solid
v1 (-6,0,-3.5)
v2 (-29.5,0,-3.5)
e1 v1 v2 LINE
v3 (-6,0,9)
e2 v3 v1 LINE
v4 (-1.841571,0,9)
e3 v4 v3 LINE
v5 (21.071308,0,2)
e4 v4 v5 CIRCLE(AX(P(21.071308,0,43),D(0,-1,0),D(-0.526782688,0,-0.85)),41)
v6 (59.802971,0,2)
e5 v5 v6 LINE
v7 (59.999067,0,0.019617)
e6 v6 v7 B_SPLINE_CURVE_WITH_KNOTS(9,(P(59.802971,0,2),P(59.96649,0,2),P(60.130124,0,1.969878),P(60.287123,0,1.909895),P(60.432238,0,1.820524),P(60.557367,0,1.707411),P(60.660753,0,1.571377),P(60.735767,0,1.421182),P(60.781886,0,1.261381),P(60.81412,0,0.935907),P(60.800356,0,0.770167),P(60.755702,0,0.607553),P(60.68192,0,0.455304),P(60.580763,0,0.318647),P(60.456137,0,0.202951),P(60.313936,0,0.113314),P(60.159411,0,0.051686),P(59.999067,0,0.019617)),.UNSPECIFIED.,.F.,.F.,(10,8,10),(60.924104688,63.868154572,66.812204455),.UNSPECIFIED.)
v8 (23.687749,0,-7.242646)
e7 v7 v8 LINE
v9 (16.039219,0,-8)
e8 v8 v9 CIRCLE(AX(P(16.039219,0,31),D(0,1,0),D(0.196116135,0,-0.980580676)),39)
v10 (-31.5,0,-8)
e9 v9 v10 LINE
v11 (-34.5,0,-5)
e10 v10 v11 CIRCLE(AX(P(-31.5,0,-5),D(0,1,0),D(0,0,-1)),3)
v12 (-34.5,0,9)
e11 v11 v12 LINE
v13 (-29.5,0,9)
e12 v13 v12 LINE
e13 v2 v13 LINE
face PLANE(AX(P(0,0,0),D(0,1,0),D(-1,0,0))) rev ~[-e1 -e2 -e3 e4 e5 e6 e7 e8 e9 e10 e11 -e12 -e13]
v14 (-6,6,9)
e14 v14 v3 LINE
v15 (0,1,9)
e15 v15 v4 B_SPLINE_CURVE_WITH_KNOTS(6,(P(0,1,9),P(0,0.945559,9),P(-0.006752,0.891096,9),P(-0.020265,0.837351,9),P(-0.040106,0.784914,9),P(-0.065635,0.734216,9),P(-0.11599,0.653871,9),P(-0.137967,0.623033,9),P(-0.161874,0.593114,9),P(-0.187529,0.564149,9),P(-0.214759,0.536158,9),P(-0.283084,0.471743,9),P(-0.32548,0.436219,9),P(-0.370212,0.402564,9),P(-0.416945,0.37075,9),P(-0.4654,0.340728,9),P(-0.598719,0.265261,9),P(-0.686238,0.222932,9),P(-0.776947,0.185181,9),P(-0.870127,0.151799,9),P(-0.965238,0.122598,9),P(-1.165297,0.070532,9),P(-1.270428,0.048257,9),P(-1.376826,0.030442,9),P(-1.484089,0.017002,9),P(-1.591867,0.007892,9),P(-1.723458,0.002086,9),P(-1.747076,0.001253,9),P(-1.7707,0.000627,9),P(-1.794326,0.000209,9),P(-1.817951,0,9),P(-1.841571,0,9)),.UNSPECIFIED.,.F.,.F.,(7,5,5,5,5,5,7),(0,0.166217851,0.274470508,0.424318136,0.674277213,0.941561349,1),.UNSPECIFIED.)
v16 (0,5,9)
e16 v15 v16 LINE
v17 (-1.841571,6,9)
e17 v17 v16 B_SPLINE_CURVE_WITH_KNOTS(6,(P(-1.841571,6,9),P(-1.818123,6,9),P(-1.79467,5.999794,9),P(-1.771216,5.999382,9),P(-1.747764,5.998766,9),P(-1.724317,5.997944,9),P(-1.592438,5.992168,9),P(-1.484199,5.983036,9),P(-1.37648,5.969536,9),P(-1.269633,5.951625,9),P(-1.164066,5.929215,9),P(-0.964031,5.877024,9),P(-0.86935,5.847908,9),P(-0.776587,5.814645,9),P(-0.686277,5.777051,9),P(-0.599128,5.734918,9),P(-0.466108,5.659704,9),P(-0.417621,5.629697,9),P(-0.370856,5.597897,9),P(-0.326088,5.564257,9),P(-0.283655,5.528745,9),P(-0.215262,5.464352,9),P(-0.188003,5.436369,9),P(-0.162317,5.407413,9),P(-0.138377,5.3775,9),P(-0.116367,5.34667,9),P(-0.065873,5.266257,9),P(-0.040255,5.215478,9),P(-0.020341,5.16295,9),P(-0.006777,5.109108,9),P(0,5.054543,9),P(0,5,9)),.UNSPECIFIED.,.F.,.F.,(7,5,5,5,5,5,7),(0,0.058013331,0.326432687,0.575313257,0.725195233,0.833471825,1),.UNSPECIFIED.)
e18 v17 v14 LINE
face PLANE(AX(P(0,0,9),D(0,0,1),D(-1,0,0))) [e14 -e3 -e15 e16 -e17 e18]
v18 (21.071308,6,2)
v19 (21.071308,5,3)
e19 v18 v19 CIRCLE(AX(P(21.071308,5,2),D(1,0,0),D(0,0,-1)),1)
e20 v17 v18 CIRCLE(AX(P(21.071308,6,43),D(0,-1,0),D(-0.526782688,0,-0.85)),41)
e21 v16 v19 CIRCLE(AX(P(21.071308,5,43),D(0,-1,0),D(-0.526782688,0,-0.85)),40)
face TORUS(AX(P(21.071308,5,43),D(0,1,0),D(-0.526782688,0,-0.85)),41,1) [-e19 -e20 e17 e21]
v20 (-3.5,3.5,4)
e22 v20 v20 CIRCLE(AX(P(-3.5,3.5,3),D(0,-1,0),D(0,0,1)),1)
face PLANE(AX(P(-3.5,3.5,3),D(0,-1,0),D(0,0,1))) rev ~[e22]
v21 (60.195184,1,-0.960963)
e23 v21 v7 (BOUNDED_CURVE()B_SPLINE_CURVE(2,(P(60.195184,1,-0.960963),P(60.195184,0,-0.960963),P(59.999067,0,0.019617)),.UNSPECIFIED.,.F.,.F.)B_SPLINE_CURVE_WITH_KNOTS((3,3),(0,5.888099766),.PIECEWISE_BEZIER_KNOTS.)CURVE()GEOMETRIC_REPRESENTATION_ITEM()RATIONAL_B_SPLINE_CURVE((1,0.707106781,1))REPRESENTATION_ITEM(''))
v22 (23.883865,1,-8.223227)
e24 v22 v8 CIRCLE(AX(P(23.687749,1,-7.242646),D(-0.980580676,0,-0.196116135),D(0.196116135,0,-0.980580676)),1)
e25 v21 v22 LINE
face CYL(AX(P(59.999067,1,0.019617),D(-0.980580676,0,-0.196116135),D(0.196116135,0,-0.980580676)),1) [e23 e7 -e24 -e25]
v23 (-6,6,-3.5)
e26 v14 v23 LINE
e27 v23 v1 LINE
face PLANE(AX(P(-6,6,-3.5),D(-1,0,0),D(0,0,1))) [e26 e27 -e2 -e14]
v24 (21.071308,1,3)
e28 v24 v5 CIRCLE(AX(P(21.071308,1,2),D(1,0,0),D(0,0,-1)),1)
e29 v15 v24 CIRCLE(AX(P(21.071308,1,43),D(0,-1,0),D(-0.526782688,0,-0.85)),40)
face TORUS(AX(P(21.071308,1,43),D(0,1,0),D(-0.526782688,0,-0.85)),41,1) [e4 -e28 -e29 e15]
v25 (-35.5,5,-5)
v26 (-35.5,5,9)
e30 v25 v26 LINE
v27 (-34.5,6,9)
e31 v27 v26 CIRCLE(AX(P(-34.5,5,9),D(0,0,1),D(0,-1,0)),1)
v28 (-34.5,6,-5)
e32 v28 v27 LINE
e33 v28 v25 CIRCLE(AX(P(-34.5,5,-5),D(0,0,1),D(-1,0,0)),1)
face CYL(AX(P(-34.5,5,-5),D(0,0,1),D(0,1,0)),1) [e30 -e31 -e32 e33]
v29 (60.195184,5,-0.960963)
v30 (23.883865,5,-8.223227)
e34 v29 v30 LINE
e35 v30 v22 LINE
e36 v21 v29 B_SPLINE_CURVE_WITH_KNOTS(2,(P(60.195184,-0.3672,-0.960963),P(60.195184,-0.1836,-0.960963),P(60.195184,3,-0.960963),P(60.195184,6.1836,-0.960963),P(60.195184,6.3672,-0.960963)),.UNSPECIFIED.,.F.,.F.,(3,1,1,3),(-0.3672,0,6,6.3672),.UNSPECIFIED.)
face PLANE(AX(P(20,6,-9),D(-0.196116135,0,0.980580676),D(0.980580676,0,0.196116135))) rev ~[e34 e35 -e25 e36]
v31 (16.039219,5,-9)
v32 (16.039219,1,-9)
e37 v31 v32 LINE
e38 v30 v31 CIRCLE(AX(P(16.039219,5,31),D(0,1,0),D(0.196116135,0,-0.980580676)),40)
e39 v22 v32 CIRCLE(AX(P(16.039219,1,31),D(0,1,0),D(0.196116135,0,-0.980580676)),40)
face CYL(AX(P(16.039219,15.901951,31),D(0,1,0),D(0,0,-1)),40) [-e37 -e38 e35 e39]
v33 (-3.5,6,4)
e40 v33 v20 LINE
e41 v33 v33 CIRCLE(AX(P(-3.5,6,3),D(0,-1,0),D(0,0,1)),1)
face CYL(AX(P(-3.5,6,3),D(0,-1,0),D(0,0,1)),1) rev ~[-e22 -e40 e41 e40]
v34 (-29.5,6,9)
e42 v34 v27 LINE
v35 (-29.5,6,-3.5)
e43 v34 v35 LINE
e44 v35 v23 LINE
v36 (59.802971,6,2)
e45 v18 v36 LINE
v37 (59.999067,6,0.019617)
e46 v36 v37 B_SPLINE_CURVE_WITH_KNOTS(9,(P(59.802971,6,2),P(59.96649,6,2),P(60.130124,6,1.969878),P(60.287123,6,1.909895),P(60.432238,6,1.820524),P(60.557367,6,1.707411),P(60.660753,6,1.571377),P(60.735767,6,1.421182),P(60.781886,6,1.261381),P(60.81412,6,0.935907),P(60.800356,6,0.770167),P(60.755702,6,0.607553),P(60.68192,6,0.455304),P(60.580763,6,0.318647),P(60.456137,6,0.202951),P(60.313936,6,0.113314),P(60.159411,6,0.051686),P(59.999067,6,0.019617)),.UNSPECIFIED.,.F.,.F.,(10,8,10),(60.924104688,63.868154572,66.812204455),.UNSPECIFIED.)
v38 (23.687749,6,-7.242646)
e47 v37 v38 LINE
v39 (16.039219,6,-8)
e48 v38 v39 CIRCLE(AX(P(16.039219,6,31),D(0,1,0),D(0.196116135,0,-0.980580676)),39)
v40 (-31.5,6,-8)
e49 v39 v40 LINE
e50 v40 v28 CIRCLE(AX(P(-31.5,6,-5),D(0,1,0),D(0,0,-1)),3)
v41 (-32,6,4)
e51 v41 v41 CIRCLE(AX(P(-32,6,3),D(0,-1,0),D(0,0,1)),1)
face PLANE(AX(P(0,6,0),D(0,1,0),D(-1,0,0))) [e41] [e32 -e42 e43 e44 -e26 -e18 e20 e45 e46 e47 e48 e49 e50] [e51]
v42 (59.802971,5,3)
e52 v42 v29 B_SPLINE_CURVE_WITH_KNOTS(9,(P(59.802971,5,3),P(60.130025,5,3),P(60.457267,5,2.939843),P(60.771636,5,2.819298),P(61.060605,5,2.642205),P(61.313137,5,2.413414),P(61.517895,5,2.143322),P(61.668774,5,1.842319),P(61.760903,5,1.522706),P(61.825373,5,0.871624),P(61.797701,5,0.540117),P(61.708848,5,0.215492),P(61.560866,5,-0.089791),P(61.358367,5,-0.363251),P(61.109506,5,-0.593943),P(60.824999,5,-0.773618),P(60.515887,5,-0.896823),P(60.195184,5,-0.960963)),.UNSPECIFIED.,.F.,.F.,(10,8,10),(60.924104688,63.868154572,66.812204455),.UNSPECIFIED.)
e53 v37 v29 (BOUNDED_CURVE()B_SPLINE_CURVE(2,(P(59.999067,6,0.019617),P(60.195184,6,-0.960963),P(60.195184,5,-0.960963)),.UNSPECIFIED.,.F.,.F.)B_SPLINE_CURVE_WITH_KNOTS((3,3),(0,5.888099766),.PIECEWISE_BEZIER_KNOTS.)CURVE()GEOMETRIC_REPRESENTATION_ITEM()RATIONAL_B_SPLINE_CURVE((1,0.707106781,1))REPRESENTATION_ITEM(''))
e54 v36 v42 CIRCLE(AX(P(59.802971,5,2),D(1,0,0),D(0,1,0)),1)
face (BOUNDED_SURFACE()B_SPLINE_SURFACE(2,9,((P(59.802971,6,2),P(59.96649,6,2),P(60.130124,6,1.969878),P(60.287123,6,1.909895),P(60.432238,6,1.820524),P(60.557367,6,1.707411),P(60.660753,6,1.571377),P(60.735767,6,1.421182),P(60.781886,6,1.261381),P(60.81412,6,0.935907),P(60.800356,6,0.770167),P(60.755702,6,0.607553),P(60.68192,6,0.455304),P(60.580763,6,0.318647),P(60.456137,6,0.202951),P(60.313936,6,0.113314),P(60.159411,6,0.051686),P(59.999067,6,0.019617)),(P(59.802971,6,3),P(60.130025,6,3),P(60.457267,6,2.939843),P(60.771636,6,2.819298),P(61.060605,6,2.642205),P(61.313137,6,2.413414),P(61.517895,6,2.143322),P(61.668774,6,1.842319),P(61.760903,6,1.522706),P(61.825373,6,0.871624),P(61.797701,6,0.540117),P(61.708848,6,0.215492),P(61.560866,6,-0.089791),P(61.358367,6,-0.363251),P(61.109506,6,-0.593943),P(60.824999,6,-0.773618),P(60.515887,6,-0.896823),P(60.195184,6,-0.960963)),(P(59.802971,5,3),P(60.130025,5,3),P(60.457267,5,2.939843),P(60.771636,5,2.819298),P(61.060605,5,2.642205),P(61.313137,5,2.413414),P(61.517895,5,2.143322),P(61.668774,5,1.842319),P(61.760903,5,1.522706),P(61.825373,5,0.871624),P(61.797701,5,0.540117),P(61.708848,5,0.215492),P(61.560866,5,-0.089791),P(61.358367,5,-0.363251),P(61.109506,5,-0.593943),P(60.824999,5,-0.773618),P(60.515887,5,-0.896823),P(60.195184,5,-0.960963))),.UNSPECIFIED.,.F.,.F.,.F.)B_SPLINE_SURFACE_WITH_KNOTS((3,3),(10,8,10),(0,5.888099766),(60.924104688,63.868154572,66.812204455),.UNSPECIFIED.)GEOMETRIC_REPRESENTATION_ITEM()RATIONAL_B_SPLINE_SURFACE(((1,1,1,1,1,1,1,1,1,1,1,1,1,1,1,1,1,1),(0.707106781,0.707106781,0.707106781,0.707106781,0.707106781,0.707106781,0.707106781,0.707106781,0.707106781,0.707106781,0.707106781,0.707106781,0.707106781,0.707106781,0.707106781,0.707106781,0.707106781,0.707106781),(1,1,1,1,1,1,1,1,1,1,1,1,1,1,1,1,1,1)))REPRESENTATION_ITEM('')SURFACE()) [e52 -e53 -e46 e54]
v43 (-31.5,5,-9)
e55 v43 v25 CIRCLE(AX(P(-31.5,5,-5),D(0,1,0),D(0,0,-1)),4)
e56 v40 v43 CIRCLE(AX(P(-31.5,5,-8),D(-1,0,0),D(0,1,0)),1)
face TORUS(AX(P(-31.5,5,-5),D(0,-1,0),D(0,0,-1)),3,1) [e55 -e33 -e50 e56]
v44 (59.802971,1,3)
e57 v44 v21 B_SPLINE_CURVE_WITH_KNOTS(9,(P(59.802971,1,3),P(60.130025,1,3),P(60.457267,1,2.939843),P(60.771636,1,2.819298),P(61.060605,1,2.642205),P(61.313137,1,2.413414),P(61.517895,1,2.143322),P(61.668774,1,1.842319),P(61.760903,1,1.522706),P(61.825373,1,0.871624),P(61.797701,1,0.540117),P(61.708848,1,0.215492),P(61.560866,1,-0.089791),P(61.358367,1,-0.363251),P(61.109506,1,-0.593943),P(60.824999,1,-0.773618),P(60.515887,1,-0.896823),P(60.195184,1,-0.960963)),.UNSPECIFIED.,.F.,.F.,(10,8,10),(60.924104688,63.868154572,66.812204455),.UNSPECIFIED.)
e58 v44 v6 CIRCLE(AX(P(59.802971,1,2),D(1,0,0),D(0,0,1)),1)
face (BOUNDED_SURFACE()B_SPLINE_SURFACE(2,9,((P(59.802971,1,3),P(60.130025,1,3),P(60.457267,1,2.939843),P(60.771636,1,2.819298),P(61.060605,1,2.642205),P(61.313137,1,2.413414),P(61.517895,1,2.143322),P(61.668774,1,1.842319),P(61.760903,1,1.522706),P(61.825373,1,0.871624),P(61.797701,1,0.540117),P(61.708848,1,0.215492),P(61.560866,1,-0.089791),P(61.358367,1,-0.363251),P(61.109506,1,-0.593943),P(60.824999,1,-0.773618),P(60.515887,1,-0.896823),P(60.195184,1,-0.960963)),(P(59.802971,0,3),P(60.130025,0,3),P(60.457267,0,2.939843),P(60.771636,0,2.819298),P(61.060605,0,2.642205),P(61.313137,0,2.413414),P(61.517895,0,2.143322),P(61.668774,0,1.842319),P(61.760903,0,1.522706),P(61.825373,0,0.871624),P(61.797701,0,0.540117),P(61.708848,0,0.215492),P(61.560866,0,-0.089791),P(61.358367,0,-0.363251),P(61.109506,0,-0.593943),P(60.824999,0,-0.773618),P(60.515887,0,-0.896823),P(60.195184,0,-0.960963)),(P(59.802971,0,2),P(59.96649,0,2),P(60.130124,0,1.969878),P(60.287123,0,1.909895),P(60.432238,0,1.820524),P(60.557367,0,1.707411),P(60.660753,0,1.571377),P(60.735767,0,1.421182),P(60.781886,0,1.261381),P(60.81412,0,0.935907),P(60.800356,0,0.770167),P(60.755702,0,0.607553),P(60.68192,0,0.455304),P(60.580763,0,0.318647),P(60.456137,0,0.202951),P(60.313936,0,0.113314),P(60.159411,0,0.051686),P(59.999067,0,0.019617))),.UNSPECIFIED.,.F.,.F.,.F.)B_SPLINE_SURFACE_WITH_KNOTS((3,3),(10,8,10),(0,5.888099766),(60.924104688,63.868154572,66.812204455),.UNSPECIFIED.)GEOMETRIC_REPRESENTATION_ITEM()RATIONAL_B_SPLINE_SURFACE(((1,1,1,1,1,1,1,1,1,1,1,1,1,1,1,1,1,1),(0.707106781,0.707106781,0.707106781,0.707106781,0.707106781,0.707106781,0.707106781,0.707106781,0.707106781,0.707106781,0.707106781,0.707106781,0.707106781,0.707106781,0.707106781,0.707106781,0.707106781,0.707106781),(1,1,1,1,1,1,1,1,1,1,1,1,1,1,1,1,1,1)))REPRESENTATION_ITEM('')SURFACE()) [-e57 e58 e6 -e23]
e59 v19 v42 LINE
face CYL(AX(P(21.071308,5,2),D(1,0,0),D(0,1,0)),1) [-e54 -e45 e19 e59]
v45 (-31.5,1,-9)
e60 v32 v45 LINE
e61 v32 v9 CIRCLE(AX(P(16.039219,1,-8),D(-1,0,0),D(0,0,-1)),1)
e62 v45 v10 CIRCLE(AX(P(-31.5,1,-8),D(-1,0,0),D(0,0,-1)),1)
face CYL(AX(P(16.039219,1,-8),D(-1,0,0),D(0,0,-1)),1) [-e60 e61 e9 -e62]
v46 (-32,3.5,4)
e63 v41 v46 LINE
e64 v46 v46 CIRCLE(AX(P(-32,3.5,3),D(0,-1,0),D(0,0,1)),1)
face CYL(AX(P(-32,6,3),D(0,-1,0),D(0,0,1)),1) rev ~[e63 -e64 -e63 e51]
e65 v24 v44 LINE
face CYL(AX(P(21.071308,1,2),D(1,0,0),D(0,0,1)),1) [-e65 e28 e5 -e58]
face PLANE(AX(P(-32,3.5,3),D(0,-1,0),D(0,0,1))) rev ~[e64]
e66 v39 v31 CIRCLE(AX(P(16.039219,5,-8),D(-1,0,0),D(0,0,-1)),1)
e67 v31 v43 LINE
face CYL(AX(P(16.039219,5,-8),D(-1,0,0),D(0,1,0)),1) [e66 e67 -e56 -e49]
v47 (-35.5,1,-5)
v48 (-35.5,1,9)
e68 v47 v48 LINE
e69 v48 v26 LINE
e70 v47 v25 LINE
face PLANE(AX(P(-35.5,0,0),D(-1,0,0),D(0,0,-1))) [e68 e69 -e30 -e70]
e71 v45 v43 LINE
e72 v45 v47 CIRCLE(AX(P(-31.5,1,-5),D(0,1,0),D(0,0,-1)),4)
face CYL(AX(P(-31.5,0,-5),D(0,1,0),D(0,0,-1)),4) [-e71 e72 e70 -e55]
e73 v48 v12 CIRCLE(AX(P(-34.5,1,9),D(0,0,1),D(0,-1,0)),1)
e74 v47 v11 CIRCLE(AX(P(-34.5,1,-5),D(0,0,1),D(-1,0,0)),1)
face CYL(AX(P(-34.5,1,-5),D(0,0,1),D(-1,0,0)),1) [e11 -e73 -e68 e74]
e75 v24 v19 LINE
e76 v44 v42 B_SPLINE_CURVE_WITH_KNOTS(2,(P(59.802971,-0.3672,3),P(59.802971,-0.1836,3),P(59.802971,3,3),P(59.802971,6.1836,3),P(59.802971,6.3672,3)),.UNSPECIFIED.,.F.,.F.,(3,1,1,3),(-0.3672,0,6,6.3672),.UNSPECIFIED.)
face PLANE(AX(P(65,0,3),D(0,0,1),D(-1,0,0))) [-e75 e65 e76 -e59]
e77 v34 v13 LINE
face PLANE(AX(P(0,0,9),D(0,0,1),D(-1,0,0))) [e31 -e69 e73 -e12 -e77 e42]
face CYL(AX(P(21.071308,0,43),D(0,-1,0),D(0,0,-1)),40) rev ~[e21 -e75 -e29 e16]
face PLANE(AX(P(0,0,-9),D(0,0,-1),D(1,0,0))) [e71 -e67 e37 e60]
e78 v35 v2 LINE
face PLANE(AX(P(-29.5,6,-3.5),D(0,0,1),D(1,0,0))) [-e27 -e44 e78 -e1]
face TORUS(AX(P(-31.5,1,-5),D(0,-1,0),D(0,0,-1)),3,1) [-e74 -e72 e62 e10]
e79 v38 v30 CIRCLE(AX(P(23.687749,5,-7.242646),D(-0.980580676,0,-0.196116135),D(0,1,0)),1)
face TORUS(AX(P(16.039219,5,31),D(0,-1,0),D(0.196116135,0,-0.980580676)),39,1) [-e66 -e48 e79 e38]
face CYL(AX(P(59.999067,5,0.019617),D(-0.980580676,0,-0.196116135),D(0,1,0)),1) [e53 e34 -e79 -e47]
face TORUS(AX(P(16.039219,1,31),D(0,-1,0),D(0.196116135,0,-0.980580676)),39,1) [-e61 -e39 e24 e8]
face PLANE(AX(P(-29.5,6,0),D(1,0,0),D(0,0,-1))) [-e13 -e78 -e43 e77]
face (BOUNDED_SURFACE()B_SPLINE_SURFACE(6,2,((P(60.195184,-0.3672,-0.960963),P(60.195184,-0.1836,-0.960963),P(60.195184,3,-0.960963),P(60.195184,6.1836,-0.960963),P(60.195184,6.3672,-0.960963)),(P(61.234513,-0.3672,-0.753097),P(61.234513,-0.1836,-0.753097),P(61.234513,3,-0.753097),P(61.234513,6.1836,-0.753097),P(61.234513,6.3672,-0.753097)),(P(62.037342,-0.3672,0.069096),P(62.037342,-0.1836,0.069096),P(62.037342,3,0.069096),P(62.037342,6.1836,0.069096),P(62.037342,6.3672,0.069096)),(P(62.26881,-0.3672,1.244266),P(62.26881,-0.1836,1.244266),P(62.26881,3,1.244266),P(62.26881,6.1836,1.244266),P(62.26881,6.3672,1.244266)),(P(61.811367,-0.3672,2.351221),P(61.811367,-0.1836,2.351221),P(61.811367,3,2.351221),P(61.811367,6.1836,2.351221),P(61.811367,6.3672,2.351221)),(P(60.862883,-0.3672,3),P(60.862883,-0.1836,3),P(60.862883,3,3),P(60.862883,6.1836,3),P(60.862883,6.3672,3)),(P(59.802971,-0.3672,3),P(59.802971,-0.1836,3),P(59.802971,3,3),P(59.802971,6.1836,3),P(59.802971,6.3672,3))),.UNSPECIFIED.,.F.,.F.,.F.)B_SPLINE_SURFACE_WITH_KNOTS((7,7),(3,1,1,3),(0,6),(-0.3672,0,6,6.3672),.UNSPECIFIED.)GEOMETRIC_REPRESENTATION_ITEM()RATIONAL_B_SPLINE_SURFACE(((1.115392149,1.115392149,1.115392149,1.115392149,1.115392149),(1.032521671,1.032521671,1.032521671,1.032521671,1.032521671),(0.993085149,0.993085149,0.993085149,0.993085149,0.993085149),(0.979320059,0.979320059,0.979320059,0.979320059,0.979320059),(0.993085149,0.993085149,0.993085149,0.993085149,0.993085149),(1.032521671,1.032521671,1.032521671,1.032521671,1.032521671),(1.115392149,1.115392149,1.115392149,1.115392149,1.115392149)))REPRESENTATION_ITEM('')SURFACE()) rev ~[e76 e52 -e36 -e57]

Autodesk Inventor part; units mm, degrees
ref_plane "YZ Plane" through (0, 0, 0) normal (1, 0, 0) x (0, 1, 0)
ref_plane "XZ Plane" through (0, 0, 0) normal (0, 1, 0) x (-1, 0, 0)
ref_plane "XY Plane" through (0, 0, 0) normal (0, 0, 1) x (1, 0, 0)
sketch "Sketch1" plane through (0, 0, 0) normal (0, 1, 0) x (-1, 0, 0)
  line L0 (0, -12.6) -> (0, 12.6) projected
  line L1 (35.5, -9) -> (0, -9)
  line L2 (0, -9) -> (0, 9)
  line L3 (0, 9) -> (35.5, 9)
  line L4 (35.5, 9) -> (35.5, -9)
  line L5 (0, 0) -> (0, -9)
  line L6 (0, 0) -> (0, -9)
  line L7 (55.6, 0) -> (-85.1, 0) projected
  line L8 (0, -9) -> (-65, -9)
  line L9 (-65, -9) -> (-65, 3)
  line L10 (-65, 3) -> (0, 3)
  line L11 (0, 3) -> (0, -9)
  point P0 (0, 0)
  dimension "d53" = 18
  dimension "d54" = 35.5
  dimension "d56" = 6
  dimension "d57" = 65
extrude "Extrusion3" add sketch "Sketch1" along normal blind 6
sketch "Sketch4" plane through (0, 6, 0) normal (0, 1, 0) x (1, 0, 0)
  line L0 (-35.5, 9) -> (-35.5, -9) projected
  line L1 (-35.5, -9) -> (0, -9) projected
  line L2 (0, -9) -> (0, -3) projected
  line L3 (0, -3) -> (65, -3) projected
  line L4 (65, -3) -> (65, 9) projected
  line L5 (65, 9) -> (-35.5, 9) projected
  line L6 (0, 12.6) -> (0, -12.6) projected
  line L7 (-55.6, 0) -> (85.1, 0) projected
  line L8 (-29.5, 3.5) -> (-6, 3.5)
  line L9 (-6, 3.5) -> (-6, -9)
  line L10 (-6, -9) -> (-29.5, -9)
  line L11 (-29.5, -9) -> (-29.5, 3.5)
  line L12 (-35.5, -9) -> (0, -9) projected
  line L13 (65, 9) -> (-35.5, 9) projected
  line L14 (20, 9) -> (65, 0)
  point P0 (0, 0)
  point P1 (0, 9)
  dimension "d58" = 23.5
  dimension "d59" = 12.5
  dimension "d60" = 6
  dimension "d64" = 20
extrude "Extrusion5" cut sketch "Sketch4" against normal up to next contours L11 L8 L9 L7 | L7 L9 L1 L11 | L5 L4 L14
fillet "Fillet10" radius 40 2 edges at (0, 3, 3) (20, 3, -9)
fillet "Fillet11" radius 2 2 edges at (65, 3, 0) (65, 3, 3)
sketch "Sketch5" plane through (0, 6, 0) normal (0, 1, 0) x (1, 0, 0)
  arc A0 (59.802, -3) -> (60.1942, 0.9612) centre (59.802, -1) ccw projected
  line L0 (60.1942, 0.9612) -> (23.8839, 8.2232) projected
  arc A1 (23.8839, 8.2232) -> (16.0392, 9) centre (16.0392, -31) ccw projected
  line L1 (16.0392, 9) -> (-35.5, 9) projected
  line L2 (-35.5, 9) -> (-35.5, -9) projected
  line L3 (-35.5, -9) -> (-29.5, -9) projected
  line L4 (-29.5, -9) -> (-29.5, 3.5) projected
  line L5 (-29.5, 3.5) -> (-6, 3.5) projected
  line L6 (-6, 3.5) -> (-6, -9) projected
  line L7 (-6, -9) -> (0, -9) projected
  arc A2 (21.0713, -3) -> (0, -9) centre (21.0713, -43) ccw projected
  line L8 (21.0713, -3) -> (59.802, -3) projected
  line L9 (0, 19.6325) -> (0, -53.4387) projected
  line L10 (-55.6, 0) -> (85.1, 0) projected
  point P0 (0, 0)
  point P1 (-32, -3)
  point P2 (-3.5, -3)
  dimension "d69" = 6
  dimension "d70" = 6
  dimension "d71" = 2.5
  dimension "d72" = 2.5
hole "Hole3" at (-32, 6, 3) at (-3.5, 6, 3) direction (0, -1, 0) diameter 2 depth 2.5
fillet "Fillet12" radius 4 1 edges at (-35.5, 3, -9)
fillet "Fillet13" radius 1 14 edges at (19.9807, 0, -8.8053) (40.4371, 0, 3) (61.7931, 0, 1.1972) (42.0395, 0, -4.5921) (-7.7304, 0, -9) (-34.3284, 0, -7.8284) (-35.5, 0, 2) (-34.3284, 6, -7.8284) (-35.5, 6, 2) (19.9807, 6, -8.8053) (42.0395, 6, -4.5921) (61.7931, 6, 1.1972) (40.4371, 6, 3) (-7.7304, 6, -9)
properties part number "tibia_v3"
